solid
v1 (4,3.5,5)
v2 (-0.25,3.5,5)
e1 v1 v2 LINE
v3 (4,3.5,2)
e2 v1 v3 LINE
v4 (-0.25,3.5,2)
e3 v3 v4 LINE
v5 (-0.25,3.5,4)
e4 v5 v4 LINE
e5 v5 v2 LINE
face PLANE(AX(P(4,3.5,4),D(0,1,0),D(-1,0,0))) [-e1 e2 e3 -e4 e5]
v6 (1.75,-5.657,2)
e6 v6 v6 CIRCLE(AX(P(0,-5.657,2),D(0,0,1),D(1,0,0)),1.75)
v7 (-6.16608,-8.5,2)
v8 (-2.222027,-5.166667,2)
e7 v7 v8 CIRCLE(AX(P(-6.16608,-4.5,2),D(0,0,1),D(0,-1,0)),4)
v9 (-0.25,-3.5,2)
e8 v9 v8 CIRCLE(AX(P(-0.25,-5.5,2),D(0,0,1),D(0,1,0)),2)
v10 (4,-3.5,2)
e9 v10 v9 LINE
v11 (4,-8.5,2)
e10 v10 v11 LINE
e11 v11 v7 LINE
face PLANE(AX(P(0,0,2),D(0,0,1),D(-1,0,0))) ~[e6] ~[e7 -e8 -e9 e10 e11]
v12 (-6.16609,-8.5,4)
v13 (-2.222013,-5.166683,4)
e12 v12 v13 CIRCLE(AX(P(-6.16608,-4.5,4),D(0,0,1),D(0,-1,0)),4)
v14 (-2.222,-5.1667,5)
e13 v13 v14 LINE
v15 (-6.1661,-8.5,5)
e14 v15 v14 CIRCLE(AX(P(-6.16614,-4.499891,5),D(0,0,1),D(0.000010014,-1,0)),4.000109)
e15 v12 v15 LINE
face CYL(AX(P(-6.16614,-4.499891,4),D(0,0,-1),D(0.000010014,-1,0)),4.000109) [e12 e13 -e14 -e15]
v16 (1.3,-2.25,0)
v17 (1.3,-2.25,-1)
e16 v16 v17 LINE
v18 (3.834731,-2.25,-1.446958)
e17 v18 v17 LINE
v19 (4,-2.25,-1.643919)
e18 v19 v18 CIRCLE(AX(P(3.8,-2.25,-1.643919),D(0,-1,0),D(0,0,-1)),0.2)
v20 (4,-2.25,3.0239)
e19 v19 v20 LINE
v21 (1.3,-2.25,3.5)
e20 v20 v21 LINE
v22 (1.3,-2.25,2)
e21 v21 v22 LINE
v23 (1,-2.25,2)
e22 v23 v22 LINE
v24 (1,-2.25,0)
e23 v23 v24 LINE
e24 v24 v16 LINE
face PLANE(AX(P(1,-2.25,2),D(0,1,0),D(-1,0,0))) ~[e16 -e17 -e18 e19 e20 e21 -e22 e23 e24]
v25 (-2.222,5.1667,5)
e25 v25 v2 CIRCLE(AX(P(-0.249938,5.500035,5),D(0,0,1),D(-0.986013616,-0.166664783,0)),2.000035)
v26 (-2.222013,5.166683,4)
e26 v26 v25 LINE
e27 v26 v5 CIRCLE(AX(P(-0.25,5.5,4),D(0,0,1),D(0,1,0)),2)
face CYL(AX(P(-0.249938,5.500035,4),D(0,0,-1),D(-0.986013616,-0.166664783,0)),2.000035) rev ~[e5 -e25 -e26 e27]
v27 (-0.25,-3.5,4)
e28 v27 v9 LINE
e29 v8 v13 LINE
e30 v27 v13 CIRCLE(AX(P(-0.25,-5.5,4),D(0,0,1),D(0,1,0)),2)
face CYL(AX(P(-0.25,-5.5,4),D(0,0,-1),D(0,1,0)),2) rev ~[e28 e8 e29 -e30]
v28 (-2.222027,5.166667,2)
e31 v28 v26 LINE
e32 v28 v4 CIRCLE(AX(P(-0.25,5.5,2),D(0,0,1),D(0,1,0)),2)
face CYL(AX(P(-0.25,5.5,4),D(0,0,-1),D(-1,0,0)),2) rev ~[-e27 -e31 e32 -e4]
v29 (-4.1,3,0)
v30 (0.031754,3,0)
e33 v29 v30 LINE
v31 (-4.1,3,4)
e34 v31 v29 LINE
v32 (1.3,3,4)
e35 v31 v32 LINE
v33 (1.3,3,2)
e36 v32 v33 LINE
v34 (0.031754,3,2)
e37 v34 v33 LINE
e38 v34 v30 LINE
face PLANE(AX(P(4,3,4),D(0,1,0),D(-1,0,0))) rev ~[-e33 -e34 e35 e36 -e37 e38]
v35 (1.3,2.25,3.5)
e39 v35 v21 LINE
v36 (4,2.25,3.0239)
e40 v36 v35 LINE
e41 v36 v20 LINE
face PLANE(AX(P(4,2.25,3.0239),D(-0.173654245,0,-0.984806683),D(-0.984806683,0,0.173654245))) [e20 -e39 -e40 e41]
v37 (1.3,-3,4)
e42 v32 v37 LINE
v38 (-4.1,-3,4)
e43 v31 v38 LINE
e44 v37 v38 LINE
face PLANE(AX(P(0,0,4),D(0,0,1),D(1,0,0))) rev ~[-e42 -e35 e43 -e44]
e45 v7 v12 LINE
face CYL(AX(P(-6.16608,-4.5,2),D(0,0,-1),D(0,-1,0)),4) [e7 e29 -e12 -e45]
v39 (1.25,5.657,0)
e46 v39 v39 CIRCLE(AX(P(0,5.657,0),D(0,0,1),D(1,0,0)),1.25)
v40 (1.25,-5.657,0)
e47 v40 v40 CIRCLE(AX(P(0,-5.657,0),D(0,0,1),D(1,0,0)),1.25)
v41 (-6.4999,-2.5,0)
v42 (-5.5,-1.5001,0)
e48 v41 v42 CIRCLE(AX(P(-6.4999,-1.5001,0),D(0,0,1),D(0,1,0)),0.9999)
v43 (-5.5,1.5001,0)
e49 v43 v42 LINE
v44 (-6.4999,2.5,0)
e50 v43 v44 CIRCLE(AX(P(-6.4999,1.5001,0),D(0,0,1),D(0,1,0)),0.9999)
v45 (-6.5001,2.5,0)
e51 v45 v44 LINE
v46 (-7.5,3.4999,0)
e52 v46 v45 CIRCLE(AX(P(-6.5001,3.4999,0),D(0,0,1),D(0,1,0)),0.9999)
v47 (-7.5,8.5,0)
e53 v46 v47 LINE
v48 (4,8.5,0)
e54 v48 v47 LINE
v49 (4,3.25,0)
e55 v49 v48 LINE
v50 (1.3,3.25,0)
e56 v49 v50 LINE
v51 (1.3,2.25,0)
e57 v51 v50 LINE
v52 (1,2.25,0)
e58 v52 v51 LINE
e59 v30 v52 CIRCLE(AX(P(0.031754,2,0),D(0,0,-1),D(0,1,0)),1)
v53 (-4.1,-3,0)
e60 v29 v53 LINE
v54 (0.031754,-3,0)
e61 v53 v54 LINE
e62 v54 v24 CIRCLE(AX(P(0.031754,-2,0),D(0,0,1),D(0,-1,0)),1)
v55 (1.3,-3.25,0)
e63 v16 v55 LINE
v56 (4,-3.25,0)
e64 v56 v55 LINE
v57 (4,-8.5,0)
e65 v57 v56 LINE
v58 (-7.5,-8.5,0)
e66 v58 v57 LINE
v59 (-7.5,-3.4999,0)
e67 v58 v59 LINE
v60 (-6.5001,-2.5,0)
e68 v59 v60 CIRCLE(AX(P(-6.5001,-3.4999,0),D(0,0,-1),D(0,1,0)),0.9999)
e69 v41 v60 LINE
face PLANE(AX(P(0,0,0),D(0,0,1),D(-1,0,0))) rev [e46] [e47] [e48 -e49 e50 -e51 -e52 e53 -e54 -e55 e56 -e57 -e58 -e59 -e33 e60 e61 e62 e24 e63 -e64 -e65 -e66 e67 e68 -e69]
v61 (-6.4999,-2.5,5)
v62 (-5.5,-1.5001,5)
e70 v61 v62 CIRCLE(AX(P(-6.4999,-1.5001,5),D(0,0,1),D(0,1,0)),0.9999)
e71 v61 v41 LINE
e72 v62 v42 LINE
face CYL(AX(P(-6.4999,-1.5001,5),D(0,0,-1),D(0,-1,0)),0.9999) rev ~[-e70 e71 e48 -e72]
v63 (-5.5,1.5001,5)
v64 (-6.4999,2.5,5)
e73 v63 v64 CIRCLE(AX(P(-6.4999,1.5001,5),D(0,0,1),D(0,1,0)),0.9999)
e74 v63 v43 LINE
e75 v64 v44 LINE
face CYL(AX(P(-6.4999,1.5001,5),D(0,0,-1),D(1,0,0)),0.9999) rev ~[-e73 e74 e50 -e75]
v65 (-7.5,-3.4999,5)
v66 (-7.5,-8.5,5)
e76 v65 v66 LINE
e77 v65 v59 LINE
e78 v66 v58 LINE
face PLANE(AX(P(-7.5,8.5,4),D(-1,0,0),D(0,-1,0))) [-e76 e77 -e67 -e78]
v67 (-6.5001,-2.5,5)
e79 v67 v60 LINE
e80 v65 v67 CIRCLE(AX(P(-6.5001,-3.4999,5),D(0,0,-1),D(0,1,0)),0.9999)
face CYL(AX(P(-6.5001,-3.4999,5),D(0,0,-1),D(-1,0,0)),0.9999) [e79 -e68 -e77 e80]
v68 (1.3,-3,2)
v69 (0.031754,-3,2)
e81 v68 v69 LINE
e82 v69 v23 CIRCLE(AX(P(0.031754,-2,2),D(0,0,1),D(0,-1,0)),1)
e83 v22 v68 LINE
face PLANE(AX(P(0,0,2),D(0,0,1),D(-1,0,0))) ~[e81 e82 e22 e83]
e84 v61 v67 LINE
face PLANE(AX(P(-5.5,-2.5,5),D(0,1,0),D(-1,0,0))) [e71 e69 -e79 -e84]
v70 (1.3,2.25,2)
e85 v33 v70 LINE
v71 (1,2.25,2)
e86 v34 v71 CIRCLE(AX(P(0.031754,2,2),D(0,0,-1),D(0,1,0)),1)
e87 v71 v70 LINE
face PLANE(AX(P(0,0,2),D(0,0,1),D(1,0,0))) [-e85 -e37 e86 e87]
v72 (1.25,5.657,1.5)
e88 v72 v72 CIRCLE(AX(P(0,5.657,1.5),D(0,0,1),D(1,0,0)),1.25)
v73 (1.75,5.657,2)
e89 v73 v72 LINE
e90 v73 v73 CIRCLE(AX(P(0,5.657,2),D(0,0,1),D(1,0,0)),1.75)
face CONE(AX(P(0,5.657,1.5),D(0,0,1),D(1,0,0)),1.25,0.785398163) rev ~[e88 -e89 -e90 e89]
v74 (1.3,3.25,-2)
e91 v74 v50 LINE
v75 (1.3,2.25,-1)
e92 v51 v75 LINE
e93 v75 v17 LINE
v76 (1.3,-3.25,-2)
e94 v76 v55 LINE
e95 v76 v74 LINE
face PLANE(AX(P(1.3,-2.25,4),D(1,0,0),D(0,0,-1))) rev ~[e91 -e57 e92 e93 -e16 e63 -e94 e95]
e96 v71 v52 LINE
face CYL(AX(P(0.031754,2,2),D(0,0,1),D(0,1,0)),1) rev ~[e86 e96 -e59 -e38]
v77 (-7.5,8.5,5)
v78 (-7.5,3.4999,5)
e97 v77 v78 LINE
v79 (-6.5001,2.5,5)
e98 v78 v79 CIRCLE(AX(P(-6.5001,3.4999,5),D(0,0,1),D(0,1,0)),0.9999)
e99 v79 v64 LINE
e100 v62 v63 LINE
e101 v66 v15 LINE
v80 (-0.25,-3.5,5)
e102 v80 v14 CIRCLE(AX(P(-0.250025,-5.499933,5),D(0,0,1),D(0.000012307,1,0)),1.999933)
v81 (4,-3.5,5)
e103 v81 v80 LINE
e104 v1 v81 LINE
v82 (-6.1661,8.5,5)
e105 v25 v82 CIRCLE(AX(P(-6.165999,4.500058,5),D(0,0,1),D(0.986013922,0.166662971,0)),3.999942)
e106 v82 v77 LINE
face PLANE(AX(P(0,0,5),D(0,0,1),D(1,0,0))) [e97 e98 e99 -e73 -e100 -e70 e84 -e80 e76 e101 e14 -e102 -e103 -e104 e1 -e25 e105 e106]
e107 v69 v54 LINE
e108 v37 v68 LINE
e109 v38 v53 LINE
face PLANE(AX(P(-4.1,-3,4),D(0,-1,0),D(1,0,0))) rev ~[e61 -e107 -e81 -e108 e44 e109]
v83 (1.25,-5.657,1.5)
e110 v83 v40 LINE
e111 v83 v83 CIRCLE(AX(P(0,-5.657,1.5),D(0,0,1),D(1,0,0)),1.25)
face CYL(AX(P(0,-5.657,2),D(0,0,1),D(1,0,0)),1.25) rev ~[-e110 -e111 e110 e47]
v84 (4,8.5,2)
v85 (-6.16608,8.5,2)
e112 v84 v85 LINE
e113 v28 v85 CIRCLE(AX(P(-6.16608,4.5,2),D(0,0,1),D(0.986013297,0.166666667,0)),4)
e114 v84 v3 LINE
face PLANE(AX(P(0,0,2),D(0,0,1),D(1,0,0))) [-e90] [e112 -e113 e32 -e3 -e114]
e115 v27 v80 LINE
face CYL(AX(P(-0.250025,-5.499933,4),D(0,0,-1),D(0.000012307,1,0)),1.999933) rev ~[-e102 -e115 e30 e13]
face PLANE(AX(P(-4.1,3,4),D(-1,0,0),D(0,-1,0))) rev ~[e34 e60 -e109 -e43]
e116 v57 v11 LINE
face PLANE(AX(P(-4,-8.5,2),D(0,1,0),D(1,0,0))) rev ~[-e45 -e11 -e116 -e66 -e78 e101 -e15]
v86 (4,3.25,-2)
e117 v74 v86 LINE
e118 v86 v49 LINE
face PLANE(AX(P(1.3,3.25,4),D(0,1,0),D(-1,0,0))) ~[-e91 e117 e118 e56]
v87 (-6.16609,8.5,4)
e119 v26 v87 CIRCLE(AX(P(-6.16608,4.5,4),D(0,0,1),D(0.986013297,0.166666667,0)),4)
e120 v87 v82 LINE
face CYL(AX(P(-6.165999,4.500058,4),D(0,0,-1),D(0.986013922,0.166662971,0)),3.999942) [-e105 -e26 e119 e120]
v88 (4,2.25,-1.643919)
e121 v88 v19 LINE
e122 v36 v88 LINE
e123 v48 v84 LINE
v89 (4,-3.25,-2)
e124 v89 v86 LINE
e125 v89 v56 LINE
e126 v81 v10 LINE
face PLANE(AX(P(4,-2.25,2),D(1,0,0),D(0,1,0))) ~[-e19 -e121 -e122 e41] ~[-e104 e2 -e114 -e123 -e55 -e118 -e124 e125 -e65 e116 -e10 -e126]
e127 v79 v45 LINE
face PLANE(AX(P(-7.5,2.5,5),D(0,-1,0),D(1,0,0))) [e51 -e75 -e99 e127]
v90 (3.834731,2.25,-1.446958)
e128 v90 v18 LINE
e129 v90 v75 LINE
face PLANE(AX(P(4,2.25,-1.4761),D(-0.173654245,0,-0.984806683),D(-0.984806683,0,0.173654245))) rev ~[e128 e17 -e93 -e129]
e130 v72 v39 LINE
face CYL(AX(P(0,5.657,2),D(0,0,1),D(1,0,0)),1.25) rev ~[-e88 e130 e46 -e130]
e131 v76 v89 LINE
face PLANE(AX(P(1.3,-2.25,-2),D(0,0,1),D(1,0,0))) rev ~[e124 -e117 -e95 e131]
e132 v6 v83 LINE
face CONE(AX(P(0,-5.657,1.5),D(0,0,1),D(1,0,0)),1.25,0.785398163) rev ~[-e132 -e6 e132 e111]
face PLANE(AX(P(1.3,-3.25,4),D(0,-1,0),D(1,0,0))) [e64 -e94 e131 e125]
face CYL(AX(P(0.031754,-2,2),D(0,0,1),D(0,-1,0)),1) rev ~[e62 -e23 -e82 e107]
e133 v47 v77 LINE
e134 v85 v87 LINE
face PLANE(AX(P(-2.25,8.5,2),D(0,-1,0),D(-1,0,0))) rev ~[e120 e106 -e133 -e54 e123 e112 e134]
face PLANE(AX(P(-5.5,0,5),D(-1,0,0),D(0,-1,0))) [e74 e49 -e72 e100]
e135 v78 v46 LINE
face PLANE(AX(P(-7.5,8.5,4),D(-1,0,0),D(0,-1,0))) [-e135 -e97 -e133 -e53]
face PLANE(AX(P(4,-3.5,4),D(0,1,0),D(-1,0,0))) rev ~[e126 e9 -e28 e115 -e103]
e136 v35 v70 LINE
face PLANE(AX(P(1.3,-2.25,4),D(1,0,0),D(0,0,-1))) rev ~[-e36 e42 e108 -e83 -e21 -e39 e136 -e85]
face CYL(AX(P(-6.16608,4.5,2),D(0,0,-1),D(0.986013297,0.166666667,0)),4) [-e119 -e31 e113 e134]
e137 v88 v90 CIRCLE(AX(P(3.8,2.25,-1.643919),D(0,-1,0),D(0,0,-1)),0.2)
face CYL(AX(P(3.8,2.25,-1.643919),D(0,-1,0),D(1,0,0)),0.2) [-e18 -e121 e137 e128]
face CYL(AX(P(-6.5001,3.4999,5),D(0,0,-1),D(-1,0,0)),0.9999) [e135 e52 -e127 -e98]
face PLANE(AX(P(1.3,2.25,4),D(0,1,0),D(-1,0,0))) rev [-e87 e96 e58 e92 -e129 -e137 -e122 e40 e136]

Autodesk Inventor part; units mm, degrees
ref_plane "YZ Plane" through (0, 0, 0) normal (1, 0, 0) x (0, 1, 0)
ref_plane "XZ Plane" through (0, 0, 0) normal (0, 1, 0) x (-1, 0, 0)
ref_plane "XY Plane" through (0, 0, 0) normal (0, 0, 1) x (1, 0, 0)
sketch "Boceto1" plane through (0, 0, 0) normal (0, 0, 1) x (1, 0, 0)
  line L0 (-4, 8.5) -> (4, 8.5)
  line L1 (4, 8.5) -> (4, -8.5)
  line L2 (4, -8.5) -> (-4, -8.5)
  line L3 (-4, -8.5) -> (-4, 8.5)
  line L4 (0, -11.9) -> (0, 11.9) projected
  line L5 (-5.6, 0) -> (5.6, 0) projected
  point P0 (0, 0)
  dimension "d0" = 8
  dimension "d1" = 17
extrude "Extrusión1" add sketch "Boceto1" along normal blind 2
sketch "Boceto2" plane through (0, 0, 2) normal (0, 0, 1) x (1, 0, 0)
  circle A0 centre (0, 5.657) radius 1.25
  circle A1 centre (0, -5.657) radius 1.25
  line L0 (4, 8.5) -> (-4, 8.5) projected
  line L1 (-4, -8.5) -> (4, -8.5) projected
  point P0 (0, 0)
  dimension "d4" = 2.5
  dimension "d7" = 2.5
  dimension "d18" = 0
  dimension "d19" = 0
  dimension "d37" = 5.657
  dimension "d38" = 5.657
extrude "Extrusión2" cut sketch "Boceto2" against normal up to surface (2 mm away)
chamfer "Chaflán1" distance 0.5 angle 45 2 edges at (-1.25, 5.657, 2) (-1.25, -5.657, 2)
sketch "Boceto6" plane through (0, 0, 2) normal (0, 0, 1) x (1, 0, 0)
  line L0 (4, 8.5) -> (-4, 8.5) projected
  line L1 (-4, -8.5) -> (4, -8.5) projected
  line L2 (-4, 8.5) -> (-2.25, 8.5)
  line L3 (-2.25, 8.5) -> (-2.25, -8.5)
  line L4 (-2.25, -8.5) -> (-4, -8.5)
  line L5 (-4, -8.5) -> (-4, 8.5)
  point P0 (0, 0)
  point P1 (-0.284, 8)
  dimension "d33" = 1.75
extrude "Extrusión6" add sketch "Boceto6" along normal blind 2
sketch "Boceto7" plane through (0, 0, 4) normal (0, 0, 1) x (1, 0, 0)
  line L0 (-4, 8.5) -> (-4, -8.5) projected
  line L1 (-4, 8.5) -> (-7.5, 8.5)
  line L2 (-7.5, 8.5) -> (-7.5, -8.5)
  line L3 (-7.5, -8.5) -> (-4, -8.5)
  line L4 (-4, -8.5) -> (-4, 8.5)
  line L5 (-9.2, 0) -> (6.2, 0) projected
  line L6 (-2.25, -8.5) -> (4, -8.5) projected
  point P0 (0, 0)
  dimension "d39" = 3.5
extrude "Extrusión7" add sketch "Boceto7" against normal up to surface (4 mm away)
sketch "Boceto8" plane through (0, 0, 4) normal (0, 0, 1) x (1, 0, 0)
  line L0 (4, -8.5) -> (4, 8.5) projected
  line L1 (4, 3) -> (-3, 3)
  line L2 (-3, 3) -> (-3, -3)
  line L3 (-3, -3) -> (4, -3)
  line L4 (4, -3) -> (4, 3)
  line L5 (-9.8, 0) -> (6.3, 0) projected
  point P0 (0, 0)
  dimension "d43" = 7
  dimension "d44" = 6
extrude "Extrusión8" cut sketch "Boceto8" against normal up to surface (4 mm away)
sketch "Boceto10" plane through (0, 0, 4) normal (0, 0, 1) x (1, 0, 0)
  line L0 (4, 3) -> (-3, 3) projected
  line L1 (-3, 3) -> (-4.1, 3)
  line L2 (-4.1, 3) -> (-4.1, -3)
  line L3 (-4.1, -3) -> (-3, -3)
  line L4 (-3, -3) -> (-3, 3)
  line L5 (-2.25, -3) -> (-3, -3) projected
  point P0 (0, 0)
  dimension "d51" = 1.1
extrude "Extrusión10" cut sketch "Boceto10" against normal up to surface (4 mm away)
sketch "Boceto11" plane through (0, 0, 2) normal (0, 0, 1) x (1, 0, 0)
  line L0 (4, 3) -> (4, 8.5) projected
  line L1 (4, 3) -> (1, 3)
  line L2 (1, 3) -> (1, 2.25)
  line L3 (1, 2.25) -> (4, 2.25)
  line L4 (4, 2.25) -> (4, 3)
  point P0 (0, 0)
  dimension "d54" = 3
  dimension "d55" = 0.75
extrude "Extrusión11" add sketch "Boceto11" against normal up to surface (2 mm away)
mirror "Simetría2" about plane through (0, 0, 0) normal (0, 1, 0) of "Extrusión11"
sketch "Boceto14" plane through (1, 2.25, 2) normal (0, -1, 0) x (1, 0, 0)
  line L0 (3, -2) -> (3, 0) projected
  line L1 (3, 0) -> (3, 1.0239)
  line L2 (3, -2) -> (-8.5, -2) projected
  line L3 (3, -2) -> (3, -3.9761)
  line L4 (0.3, -3.5) -> (0.3, 1.5)
  line L5 (3, -3.9761) -> (0.3, -3.5)
  line L6 (3, 1.0239) -> (0.3, 1.5)
  line L7 (3, -3.9761) -> (3, -3.4761)
  line L8 (3, -3.4761) -> (0.3, -3)
  line L9 (3, 1.0239) -> (3, 1.5239)
  line L10 (0.3, 1.5) -> (0.3, 2)
  line L11 (0.3, 2) -> (3, 1.5239)
  line L12 (-8.5, 2) -> (-3.25, 2) projected
  line L13 (3, 1.5239) -> (3, 2)
  line L14 (3, 2) -> (0.3, 2)
  line L15 (0.3, -3.5) -> (0.3, -4)
  line L16 (0.3, -3.5) -> (0.8, -3.5) construction
  line L17 (0.3, -4) -> (3, -4)
  line L18 (3, -4) -> (3, -3.9761)
  point P0 (-1, -2)
  point P1 (2.8356, -4)
  point P2 (0.3, -2)
  point P3 (-5, -2)
  dimension "d82" = 80
  dimension "d83" = 0.5
  dimension "d84" = 100
  dimension "d85" = 4.5
  dimension "d86" = 0.5
  dimension "d87" = 0.5
  dimension "d93" = 0
  dimension "d94" = 90
  dimension "d95" = 6
  dimension "d96" = 2.7
extrude "Extrusión13" add sketch "Boceto14" along normal up to surface (4.5 mm away) contours L3 L5 L4 L8 | L6 L10 L11 L9 | L18 L17 L15 L5 | L11 L14 L13
sketch "Boceto16" plane through (1.3, -2.25, 4) normal (0, -1, 0) x (1, 0, 0)
  line L0 (0, -0.5) -> (2.7, -0.9761) projected
  line L1 (2.7, -0.9761) -> (2.7, 0) projected
  line L2 (2.7, 0) -> (0, 0) projected
  line L3 (0, 0) -> (0, -0.5) projected
  line L4 (0, -6) -> (2.7, -6) projected
  line L5 (2.7, -0.9761) -> (2.7, 0) projected
  line L6 (0, -6) -> (2.7, -6)
  line L7 (2.7, -6) -> (2.7, 0)
  line L8 (2.7, 0) -> (0, 0)
  line L9 (0, 0) -> (0, -6)
  line L10 (2.7, -6) -> (2.7, -5.4761) projected
  line L11 (0, -5) -> (0, -6) projected
  line L12 (2.7, -5.4761) -> (0, -5) projected
  line L13 (0, 0) -> (0, -0.5) projected
  point P0 (-1.3, -4)
  point P1 (2.7, -0.9761)
  point P2 (2.7, -6)
  point P3 (2.7, -6)
  point P4 (2.7, -5.4761)
  point P5 (3, -5.529)
extrude "Extrusión15" add sketch "Boceto16" along normal blind 1
mirror "Simetría4" about plane through (0, 0, 0) normal (0, 1, 0) of "Extrusión15"
fillet "Empalme6" radius 0.2 1 edges at (4, 0, -1.4761)
sketch "Boceto18" plane through (0, 0, 4) normal (0, 0, 1) x (1, 0, 0)
  line L0 (-2.25, -8.5) -> (-2.25, -3) projected
  line L1 (4, 2.25) -> (4, -8.5) projected
  line L2 (-2.25, -3) -> (4, -3)
  line L3 (4, -3) -> (4, -3.5)
  line L4 (4, -3.5) -> (-2.25, -3.5)
  line L5 (-2.25, -3.5) -> (-2.25, -3)
  line L6 (-2.25, 3) -> (1, 3) projected
  line L7 (4, 2.25) -> (4, 8.5) projected
  line L8 (-2.25, 3) -> (4, 3)
  line L9 (4, 3) -> (4, 3.5)
  line L10 (4, 3.5) -> (-2.25, 3.5)
  line L11 (-2.25, 3.5) -> (-2.25, 3)
  point P0 (0, 0)
  point P1 (4, -3.25)
  point P2 (4, 3.25)
  point P3 (-2.25, -3.5)
  point P4 (4, -3)
  point P5 (1, 3)
  point P6 (4, 3)
  point P7 (4, -3)
  dimension "d102" = 0.5
  dimension "d103" = 0.5
extrude "Extrusión16" add sketch "Boceto18" against normal up to surface (2 mm away)
fillet "Empalme7" radius 2 2 edges at (-2.25, -3.5, 3) (-2.25, 3.5, 3)
fillet "Empalme8" radius 1 2 edges at (1, 3, 1) (1, -3, 1)
fillet "Empalme9" radius 4 2 edges at (-2.25, 8.5, 3) (-2.25, -8.5, 3)
sketch "Boceto19" plane through (0, 0, 4) normal (0, 0, 1) x (1, 0, 0)
  line L0 (-4.1, -3) -> (1.3, -3) projected
  line L1 (-4.1, -3) -> (-4.1, 3) projected
  line L2 (-4.1, 3) -> (1.3, 3) projected
  line L3 (1.3, 3) -> (1.3, -3) projected
  arc A0 (-6.1661, -8.5) -> (-2.222, -5.1667) centre (-6.1661, -4.5) ccw projected
  arc A1 (-0.25, -3.5) -> (-2.222, -5.1667) centre (-0.25, -5.5) ccw projected
  line L4 (4, -3.5) -> (-0.25, -3.5) projected
  line L5 (4, 3.5) -> (4, -3.5) projected
  line L6 (4, 3.5) -> (-0.25, 3.5) projected
  arc A2 (-2.222, 5.1667) -> (-0.25, 3.5) centre (-0.25, 5.5) ccw projected
  arc A3 (-2.222, 5.1667) -> (-6.1661, 8.5) centre (-6.1661, 4.5) ccw projected
  line L7 (-7.5, 8.5) -> (-7.5, -8.5) projected
  line L8 (-6.1661, 8.5) -> (-7.5, 8.5) projected
  line L9 (-7.5, -8.5) -> (-6.1661, -8.5) projected
  point P0 (0, 0)
extrude "Extrusión17" add sketch "Boceto19" along normal blind 1 contours L1 L2 L3 L0 | L9 L7 L8 A3 A2 L6 L5 L4 A1 A0
sketch "Boceto20" plane through (0, 0, 5) normal (0, 0, 1) x (1, 0, 0)
  line L0 (-7.5, -8.5) -> (-7.5, 8.5) projected
  line L1 (-7.5, 2.5) -> (-5.5, 2.5)
  line L2 (-5.5, 2.5) -> (-5.5, -2.5)
  line L3 (-5.5, -2.5) -> (-7.5, -2.5)
  line L4 (-7.5, -2.5) -> (-7.5, 2.5)
  line L5 (-9.8, 0) -> (6.3, 0) projected
  point P0 (0, 0)
  dimension "d111" = 2
  dimension "d112" = 5
extrude "Extrusión18" cut sketch "Boceto20" against normal up to surface (5 mm away)
fillet "Empalme10" radius 1 4 edges at (-7.5, 2.5, 2.5) (-7.5, -2.5, 2.5) (-5.5, 2.5, 2.5) (-5.5, -2.5, 2.5)
equation "\"d4\" = d7"
equation "\"d38\" = d37"
equation "\"d86\" = d83"
equation "\"d87\" = d86"
properties part number "Soporte Hot End Sensor"
